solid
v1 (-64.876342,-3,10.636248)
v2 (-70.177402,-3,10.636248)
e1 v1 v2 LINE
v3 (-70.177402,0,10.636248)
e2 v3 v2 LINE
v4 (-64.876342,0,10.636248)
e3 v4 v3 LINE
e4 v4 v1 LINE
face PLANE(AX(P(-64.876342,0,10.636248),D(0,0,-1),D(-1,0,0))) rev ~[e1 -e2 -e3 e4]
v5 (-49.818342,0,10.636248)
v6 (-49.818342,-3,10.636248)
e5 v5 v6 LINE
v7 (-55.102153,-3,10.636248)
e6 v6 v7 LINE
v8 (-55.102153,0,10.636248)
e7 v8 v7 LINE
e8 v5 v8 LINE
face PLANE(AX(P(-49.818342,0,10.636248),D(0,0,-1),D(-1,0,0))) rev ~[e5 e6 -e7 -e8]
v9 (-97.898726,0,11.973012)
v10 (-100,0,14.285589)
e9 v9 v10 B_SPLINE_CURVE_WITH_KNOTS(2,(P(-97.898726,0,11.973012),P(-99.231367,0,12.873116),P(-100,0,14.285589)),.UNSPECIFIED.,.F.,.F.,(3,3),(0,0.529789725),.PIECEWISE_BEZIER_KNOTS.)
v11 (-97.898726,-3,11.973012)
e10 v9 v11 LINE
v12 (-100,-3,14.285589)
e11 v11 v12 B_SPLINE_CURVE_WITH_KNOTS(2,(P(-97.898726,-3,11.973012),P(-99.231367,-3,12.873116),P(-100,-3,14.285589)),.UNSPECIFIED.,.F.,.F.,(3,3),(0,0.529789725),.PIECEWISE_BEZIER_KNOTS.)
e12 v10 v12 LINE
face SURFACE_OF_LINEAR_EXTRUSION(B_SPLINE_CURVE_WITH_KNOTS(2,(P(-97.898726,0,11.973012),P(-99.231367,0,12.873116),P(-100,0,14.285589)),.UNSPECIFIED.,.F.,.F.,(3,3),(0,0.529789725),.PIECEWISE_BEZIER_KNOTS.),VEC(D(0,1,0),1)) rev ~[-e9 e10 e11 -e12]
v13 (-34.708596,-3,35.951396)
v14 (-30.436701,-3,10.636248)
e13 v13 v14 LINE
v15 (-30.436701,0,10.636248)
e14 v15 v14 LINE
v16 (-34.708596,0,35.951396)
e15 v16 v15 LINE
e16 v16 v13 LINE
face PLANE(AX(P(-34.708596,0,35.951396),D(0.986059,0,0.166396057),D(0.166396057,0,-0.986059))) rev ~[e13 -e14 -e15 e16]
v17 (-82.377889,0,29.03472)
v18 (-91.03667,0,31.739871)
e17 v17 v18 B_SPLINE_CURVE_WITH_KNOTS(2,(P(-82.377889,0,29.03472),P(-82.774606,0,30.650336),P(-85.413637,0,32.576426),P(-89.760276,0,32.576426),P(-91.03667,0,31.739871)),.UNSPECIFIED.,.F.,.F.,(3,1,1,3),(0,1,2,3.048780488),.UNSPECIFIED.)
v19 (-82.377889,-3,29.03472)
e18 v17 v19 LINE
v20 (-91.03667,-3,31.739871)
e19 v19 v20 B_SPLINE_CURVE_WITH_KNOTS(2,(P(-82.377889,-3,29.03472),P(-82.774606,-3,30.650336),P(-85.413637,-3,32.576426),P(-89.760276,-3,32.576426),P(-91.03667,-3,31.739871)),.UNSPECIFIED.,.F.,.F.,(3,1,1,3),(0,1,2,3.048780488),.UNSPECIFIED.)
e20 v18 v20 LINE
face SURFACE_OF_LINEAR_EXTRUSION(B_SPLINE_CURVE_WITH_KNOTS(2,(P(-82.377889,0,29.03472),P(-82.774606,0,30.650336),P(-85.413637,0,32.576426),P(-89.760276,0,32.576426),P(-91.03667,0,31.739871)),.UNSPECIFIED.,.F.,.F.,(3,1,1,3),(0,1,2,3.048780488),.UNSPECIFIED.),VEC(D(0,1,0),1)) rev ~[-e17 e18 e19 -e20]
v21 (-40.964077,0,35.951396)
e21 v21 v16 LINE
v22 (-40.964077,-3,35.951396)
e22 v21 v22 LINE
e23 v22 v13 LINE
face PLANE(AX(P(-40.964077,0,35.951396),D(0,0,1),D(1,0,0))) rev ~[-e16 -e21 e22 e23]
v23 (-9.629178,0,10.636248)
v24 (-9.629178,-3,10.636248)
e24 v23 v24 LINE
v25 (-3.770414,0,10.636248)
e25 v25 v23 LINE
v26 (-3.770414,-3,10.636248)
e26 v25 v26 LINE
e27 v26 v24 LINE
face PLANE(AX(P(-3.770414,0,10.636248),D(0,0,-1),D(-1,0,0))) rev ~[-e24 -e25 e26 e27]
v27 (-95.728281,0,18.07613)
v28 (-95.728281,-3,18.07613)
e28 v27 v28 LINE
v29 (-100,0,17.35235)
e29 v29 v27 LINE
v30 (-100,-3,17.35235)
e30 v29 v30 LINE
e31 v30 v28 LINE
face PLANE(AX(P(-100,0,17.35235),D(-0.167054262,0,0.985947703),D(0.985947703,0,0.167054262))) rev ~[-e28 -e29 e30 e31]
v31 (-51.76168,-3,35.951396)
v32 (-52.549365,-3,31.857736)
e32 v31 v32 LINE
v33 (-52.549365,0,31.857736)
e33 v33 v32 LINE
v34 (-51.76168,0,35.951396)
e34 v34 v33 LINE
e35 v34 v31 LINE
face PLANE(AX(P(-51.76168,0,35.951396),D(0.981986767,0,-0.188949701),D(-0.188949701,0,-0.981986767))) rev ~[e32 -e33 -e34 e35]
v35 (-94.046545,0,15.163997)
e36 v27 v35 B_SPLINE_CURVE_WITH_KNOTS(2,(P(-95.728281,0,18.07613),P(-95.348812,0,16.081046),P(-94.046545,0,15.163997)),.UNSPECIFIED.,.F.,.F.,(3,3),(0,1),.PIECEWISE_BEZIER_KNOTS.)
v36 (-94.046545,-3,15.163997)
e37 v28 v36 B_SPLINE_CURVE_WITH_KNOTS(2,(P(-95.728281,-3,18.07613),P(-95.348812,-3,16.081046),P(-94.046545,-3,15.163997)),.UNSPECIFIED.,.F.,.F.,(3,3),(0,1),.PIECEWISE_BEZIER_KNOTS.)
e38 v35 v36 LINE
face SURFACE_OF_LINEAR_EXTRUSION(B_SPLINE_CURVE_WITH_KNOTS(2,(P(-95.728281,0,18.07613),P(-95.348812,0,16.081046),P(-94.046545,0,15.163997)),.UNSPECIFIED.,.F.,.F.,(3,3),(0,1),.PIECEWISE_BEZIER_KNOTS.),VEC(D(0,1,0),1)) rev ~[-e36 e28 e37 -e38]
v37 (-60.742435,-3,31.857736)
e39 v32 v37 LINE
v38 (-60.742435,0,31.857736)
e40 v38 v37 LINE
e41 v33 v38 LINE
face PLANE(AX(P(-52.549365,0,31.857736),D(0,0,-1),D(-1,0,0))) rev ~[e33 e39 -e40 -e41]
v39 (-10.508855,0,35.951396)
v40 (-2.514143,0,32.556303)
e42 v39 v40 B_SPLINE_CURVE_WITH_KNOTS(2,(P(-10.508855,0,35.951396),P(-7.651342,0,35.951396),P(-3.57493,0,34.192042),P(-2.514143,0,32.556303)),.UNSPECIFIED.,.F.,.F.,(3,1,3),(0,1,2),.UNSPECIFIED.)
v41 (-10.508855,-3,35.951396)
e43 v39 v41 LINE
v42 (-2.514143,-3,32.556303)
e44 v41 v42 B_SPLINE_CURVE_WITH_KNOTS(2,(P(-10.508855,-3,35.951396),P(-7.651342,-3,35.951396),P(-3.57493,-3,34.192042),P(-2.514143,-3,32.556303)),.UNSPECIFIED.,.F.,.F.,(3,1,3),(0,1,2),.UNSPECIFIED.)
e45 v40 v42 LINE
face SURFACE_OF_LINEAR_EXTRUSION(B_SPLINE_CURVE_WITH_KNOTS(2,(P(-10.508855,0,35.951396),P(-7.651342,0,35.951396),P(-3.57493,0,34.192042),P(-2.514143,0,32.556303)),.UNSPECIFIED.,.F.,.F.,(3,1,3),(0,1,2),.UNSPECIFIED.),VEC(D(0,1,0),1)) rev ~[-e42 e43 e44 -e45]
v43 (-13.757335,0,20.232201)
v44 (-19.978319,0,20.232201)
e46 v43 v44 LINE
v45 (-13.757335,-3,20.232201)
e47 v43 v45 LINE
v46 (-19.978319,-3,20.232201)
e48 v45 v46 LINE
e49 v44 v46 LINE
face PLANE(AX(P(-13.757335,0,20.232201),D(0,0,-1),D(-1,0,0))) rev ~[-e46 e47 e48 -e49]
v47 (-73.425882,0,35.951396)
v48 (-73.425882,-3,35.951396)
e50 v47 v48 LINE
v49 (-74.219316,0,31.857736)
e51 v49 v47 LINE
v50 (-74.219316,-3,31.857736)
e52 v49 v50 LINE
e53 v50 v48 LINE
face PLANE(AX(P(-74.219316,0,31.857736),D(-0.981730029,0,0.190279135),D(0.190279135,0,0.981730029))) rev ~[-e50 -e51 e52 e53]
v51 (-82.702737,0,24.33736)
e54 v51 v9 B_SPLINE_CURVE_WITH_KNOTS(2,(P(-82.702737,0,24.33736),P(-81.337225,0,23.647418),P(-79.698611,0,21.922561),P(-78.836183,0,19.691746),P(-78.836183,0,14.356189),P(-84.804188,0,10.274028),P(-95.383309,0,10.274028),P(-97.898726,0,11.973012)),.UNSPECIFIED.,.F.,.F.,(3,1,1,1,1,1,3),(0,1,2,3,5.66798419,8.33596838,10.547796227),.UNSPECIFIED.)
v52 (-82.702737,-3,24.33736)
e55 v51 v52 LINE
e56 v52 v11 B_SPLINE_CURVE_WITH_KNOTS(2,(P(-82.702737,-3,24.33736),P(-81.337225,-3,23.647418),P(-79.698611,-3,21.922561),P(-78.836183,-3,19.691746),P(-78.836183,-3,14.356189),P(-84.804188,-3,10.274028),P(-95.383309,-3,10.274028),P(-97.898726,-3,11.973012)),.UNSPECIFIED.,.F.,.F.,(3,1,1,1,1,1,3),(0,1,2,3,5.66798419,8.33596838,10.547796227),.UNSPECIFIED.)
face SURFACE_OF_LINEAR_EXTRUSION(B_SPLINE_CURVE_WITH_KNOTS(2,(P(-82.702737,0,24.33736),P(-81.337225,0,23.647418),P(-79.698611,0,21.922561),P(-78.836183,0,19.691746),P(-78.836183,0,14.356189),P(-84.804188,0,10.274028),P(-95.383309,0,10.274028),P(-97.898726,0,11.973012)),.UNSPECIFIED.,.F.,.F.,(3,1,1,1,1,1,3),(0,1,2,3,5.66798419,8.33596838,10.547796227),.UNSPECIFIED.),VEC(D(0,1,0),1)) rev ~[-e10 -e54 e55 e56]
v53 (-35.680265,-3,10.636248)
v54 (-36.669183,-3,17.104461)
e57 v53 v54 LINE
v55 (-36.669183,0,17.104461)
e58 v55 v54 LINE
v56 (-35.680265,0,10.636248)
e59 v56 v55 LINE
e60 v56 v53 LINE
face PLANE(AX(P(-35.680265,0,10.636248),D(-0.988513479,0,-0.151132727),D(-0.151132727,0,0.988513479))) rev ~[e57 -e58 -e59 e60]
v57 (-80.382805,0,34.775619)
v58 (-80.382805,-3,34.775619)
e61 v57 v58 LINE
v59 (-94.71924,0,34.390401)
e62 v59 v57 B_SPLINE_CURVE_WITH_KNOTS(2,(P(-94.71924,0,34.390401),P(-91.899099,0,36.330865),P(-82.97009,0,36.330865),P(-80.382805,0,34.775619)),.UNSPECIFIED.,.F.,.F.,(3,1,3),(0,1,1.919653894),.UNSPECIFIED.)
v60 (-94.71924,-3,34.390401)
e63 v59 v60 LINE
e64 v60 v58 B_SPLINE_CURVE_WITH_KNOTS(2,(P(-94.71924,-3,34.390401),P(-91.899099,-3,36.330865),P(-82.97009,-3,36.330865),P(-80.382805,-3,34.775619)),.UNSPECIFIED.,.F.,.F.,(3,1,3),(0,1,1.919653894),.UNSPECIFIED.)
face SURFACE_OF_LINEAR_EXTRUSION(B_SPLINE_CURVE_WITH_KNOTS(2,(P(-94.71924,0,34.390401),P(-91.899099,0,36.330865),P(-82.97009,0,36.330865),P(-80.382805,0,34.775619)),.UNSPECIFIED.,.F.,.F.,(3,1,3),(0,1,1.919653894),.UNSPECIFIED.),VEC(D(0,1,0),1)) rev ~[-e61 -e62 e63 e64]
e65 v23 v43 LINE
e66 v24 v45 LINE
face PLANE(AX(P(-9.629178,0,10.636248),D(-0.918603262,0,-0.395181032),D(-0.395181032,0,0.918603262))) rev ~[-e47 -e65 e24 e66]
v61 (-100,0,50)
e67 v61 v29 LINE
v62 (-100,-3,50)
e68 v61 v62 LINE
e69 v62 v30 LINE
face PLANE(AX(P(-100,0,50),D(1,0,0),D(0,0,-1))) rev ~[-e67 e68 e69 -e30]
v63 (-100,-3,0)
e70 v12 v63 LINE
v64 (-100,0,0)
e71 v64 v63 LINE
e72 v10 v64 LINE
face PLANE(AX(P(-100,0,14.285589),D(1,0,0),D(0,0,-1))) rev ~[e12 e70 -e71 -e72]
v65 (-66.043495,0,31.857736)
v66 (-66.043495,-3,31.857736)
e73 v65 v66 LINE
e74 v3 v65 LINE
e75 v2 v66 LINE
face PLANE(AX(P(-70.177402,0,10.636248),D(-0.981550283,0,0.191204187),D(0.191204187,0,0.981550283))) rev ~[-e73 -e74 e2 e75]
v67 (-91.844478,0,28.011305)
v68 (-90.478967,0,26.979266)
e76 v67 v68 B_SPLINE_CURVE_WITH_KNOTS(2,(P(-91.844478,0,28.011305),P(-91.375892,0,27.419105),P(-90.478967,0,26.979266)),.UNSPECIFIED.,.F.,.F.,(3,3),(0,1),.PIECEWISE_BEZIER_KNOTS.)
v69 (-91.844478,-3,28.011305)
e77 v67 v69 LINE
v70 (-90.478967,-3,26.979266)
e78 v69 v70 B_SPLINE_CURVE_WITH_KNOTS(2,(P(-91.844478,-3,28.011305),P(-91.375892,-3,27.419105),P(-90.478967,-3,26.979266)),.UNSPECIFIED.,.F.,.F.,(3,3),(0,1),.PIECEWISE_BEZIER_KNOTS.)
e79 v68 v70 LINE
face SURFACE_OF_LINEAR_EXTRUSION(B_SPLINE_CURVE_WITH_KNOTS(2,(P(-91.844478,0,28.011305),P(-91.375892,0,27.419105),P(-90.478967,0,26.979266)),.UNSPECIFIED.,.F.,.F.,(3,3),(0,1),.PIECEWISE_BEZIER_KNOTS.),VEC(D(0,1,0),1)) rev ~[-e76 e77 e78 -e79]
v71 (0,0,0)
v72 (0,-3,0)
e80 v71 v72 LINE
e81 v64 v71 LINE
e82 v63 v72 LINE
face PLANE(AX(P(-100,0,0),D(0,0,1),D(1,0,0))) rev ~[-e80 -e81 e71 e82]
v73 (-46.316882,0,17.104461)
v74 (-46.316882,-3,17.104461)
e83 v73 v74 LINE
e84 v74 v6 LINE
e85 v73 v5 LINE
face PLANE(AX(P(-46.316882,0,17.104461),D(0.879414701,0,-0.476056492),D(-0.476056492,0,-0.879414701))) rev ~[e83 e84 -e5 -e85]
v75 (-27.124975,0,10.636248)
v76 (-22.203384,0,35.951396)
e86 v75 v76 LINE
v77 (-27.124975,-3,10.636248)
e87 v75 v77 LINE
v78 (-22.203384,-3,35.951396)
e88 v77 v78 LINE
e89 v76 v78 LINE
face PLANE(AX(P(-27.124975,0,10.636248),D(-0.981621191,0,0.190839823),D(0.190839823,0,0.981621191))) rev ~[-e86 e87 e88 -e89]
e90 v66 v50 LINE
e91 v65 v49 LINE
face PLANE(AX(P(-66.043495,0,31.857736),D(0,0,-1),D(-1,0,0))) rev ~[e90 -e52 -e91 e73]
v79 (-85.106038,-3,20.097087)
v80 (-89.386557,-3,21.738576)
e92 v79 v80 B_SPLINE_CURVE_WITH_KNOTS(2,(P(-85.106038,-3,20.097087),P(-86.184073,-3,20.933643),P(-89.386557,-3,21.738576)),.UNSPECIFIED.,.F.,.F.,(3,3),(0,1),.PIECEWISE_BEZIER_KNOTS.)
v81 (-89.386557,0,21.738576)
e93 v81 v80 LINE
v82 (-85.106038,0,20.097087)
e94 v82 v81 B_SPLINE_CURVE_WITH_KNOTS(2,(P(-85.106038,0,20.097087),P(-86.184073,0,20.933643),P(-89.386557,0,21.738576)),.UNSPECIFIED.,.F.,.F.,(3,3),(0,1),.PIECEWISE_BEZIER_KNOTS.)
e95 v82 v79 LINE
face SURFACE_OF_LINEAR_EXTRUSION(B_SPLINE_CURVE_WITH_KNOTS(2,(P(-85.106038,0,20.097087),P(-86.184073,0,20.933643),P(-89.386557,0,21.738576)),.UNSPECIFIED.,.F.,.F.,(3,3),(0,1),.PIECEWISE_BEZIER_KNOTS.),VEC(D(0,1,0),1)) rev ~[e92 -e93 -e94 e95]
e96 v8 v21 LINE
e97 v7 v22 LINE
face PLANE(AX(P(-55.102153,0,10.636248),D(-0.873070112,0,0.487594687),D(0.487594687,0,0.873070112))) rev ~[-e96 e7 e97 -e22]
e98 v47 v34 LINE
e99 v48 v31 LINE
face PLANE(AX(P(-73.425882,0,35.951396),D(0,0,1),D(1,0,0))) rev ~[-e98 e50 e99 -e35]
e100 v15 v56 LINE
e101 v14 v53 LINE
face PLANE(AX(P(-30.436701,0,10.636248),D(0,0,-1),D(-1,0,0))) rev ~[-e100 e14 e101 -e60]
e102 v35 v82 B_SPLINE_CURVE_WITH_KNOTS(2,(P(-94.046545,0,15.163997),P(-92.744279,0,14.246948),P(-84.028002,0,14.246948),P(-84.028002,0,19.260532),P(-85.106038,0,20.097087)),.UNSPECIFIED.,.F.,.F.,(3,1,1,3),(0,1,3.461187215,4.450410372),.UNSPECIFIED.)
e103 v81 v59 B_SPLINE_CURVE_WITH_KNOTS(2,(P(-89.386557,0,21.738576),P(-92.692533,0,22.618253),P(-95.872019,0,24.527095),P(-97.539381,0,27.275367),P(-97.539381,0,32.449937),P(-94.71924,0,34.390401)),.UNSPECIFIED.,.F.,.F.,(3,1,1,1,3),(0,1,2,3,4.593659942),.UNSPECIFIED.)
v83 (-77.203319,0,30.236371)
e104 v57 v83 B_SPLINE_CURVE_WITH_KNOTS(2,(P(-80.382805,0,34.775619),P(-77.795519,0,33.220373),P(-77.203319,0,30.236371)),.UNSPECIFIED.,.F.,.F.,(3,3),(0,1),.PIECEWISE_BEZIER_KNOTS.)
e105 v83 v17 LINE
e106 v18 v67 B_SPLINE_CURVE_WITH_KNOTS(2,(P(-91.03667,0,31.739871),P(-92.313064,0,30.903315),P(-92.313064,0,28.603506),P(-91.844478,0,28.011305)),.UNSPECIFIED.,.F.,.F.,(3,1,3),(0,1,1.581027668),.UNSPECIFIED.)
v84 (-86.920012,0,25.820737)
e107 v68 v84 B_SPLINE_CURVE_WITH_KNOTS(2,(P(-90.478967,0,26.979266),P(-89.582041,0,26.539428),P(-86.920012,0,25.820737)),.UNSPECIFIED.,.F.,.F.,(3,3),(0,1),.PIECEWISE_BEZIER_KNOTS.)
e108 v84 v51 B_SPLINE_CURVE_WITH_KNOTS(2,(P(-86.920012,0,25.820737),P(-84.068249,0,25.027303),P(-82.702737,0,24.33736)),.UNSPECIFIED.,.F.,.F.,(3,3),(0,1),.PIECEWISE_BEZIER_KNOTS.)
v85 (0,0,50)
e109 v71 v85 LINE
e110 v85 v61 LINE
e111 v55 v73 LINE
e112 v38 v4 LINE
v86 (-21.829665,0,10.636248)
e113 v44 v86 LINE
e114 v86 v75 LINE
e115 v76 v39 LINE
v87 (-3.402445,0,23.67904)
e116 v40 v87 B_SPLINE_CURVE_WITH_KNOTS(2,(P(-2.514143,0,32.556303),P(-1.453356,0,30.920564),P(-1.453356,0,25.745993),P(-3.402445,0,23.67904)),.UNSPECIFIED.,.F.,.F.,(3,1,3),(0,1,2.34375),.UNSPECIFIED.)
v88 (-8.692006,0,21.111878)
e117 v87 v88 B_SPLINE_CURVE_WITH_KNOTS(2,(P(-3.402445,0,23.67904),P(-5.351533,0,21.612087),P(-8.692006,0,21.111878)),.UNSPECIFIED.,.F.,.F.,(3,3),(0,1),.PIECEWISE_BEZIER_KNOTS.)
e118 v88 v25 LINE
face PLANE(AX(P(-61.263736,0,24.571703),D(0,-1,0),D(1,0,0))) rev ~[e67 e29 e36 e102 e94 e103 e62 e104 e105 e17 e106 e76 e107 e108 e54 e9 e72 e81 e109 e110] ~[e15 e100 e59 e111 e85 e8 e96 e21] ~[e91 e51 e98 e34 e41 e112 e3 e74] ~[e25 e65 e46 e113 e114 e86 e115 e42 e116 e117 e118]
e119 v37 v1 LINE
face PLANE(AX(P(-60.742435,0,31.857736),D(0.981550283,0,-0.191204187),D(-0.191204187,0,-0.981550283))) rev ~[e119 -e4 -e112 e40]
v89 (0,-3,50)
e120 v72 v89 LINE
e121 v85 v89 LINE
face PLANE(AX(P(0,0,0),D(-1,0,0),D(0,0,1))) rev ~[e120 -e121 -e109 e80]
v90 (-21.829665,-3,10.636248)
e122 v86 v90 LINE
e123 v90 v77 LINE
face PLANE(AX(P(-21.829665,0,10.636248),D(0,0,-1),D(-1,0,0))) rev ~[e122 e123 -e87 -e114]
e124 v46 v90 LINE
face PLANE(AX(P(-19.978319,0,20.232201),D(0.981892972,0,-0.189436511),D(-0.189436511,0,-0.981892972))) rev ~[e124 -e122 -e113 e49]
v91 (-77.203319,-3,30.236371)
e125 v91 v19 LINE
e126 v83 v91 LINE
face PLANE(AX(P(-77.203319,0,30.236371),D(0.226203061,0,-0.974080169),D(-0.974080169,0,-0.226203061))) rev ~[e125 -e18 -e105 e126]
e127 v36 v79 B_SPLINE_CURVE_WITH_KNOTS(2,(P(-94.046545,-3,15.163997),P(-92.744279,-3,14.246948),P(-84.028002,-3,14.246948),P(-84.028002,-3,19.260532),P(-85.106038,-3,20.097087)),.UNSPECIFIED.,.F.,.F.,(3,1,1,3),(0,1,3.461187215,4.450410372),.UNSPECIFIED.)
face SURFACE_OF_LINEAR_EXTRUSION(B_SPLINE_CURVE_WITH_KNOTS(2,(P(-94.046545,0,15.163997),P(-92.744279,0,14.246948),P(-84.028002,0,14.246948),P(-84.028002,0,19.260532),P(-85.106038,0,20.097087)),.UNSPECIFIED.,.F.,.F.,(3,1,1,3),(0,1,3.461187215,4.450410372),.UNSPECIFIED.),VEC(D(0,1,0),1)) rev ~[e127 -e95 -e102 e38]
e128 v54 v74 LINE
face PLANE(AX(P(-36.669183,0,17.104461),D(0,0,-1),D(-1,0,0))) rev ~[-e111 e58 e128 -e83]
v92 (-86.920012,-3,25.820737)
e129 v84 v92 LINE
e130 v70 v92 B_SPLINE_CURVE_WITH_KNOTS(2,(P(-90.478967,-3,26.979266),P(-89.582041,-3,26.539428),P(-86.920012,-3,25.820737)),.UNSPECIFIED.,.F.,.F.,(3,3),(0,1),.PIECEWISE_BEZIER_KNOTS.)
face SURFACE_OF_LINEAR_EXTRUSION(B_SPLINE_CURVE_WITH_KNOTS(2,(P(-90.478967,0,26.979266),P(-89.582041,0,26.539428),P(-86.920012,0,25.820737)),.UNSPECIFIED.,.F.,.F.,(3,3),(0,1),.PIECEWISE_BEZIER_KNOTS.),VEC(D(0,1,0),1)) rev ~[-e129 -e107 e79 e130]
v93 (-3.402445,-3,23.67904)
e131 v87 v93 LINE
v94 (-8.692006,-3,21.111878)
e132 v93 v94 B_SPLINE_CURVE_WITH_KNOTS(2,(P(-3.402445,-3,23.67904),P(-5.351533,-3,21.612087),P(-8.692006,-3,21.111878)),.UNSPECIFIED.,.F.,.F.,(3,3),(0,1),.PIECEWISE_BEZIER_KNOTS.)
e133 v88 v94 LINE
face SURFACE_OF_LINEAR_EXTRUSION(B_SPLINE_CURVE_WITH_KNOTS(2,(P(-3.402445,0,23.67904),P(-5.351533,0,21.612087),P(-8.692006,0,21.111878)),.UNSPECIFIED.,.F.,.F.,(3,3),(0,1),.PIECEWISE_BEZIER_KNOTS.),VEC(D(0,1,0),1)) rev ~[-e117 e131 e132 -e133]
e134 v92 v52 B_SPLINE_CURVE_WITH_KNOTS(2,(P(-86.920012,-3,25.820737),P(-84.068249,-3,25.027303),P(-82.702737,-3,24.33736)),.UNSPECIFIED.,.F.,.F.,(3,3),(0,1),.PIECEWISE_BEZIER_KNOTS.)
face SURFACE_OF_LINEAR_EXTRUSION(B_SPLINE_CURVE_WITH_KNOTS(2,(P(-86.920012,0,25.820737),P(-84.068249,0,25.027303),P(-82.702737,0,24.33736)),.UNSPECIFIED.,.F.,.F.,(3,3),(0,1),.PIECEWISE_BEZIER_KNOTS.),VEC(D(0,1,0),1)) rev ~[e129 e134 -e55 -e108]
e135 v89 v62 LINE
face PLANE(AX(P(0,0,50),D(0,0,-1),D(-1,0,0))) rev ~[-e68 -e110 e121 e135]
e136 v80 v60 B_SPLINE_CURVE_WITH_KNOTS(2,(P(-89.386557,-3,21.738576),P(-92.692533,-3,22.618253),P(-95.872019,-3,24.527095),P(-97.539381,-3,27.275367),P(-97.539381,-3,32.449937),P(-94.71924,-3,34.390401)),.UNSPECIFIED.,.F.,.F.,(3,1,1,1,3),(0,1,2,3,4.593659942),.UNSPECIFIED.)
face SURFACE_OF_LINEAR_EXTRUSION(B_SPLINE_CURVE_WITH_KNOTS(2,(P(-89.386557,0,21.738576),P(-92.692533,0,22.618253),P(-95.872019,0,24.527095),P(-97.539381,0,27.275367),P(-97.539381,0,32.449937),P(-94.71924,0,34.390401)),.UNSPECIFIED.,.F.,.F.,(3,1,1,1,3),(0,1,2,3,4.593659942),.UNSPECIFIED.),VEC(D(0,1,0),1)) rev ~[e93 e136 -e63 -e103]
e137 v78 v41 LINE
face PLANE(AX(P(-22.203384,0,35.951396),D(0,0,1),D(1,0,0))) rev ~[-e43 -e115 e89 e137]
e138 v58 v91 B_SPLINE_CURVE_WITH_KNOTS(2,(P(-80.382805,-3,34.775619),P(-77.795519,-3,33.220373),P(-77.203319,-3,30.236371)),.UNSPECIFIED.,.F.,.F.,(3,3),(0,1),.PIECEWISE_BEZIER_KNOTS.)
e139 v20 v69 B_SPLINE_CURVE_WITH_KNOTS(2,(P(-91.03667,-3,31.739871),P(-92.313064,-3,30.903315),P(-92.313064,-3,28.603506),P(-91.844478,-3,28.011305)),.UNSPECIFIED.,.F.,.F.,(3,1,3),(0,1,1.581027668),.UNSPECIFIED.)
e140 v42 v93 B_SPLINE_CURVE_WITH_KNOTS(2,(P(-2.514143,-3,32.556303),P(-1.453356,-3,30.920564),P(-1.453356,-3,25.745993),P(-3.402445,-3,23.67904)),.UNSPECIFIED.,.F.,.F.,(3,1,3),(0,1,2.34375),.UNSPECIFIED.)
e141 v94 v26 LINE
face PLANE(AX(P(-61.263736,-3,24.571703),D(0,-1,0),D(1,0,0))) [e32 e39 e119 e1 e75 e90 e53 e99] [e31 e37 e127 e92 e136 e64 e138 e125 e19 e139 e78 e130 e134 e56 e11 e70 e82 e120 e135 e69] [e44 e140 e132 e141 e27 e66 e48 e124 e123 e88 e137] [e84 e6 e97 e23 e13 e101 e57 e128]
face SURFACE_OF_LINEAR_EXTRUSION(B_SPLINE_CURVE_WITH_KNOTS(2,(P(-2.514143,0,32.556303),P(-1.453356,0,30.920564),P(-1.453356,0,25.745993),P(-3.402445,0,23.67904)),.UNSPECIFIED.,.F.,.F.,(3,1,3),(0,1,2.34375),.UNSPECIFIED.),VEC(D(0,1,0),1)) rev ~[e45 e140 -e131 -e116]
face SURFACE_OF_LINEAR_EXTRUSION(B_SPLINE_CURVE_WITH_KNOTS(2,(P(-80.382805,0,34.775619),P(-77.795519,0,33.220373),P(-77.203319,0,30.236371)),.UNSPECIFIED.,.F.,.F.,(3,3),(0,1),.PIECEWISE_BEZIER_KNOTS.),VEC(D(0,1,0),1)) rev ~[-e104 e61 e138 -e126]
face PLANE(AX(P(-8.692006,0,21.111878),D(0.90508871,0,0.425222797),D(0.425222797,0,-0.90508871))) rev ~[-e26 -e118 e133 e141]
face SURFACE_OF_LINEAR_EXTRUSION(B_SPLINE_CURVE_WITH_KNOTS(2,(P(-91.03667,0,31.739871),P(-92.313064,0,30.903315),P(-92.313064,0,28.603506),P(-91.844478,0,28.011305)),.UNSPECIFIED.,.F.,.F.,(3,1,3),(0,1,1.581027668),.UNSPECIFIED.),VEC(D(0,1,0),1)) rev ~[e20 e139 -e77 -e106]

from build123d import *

# Parameters (mm, degrees)
F1_DEPTH = 3


with BuildPart() as f1:
    # F0 (on Front) → F1 (new body)
    with BuildSketch(Plane.XZ):
        with BuildLine():
            Line((-100, 0), (0, 0))
            Line((0, 0), (0, 50))
            Line((0, 50), (-100, 50))
            Line((-100, 50), (-100, 17.3523504695))
            Line((-100, 17.3523504695), (-95.7282808558, 18.0761301251))
            add(Edge.make_bspline(
                [(-95.7282808558, 18.0761301251), (-95.3488123547, 16.081045733), (-94.0465454532, 15.1639968553)],
                knots=[0, 0, 0, 1, 1, 1], degree=2))
            add(Edge.make_bspline(
                [(-94.0465454532, 15.1639968553), (-92.7442785517, 14.2469479777), (-90.2259875899, 14.2469479777)],
                knots=[0, 0, 0, 1, 1, 1], degree=2))
            add(Edge.make_bspline(
                [(-90.2259875899, 14.2469479777), (-84.0280020719, 14.2469479777), (-84.0280020719, 17.8231511244)],
                knots=[0, 0, 0, 1, 1, 1], degree=2))
            add(Edge.make_bspline(
                [(-84.0280020719, 17.8231511244), (-84.0280020719, 19.2605318104), (-85.1060375864, 20.0970873696)],
                knots=[0, 0, 0, 1, 1, 1], degree=2))
            add(Edge.make_bspline(
                [(-85.1060375864, 20.0970873696), (-86.1840731009, 20.9336429289), (-89.3865572693, 21.738576113)],
                knots=[0, 0, 0, 1, 1, 1], degree=2))
            add(Edge.make_bspline(
                [(-89.3865572693, 21.738576113), (-92.692532847, 22.6182530928), (-94.2822758857, 23.5726738683)],
                knots=[0, 0, 0, 1, 1, 1], degree=2))
            add(Edge.make_bspline(
                [(-94.2822758857, 23.5726738683), (-95.8720189244, 24.5270946438), (-96.7056997223, 25.9012305796)],
                knots=[0, 0, 0, 1, 1, 1], degree=2))
            add(Edge.make_bspline(
                [(-96.7056997223, 25.9012305796), (-97.5393805202, 27.2753665154), (-97.5393805202, 29.2704509076)],
                knots=[0, 0, 0, 1, 1, 1], degree=2))
            add(Edge.make_bspline(
                [(-97.5393805202, 29.2704509076), (-97.5393805202, 32.449936985), (-94.7192396143, 34.390400911)],
                knots=[0, 0, 0, 1, 1, 1], degree=2))
            add(Edge.make_bspline(
                [(-94.7192396143, 34.390400911), (-91.8990987084, 36.3308648371), (-87.2477348085, 36.3308648371)],
                knots=[0, 0, 0, 1, 1, 1], degree=2))
            add(Edge.make_bspline(
                [(-87.2477348085, 36.3308648371), (-82.9700898871, 36.3308648371), (-80.3828046523, 34.7756189349)],
                knots=[0, 0, 0, 1, 1, 1], degree=2))
            add(Edge.make_bspline(
                [(-80.3828046523, 34.7756189349), (-77.7955194175, 33.2203730326), (-77.2033185749, 30.2363707285)],
                knots=[0, 0, 0, 1, 1, 1], degree=2))
            Line((-77.2033185749, 30.2363707285), (-82.3778890444, 29.0347204751))
            add(Edge.make_bspline(
                [(-82.3778890444, 29.0347204751), (-82.7746061138, 30.6503363661), (-84.0941215835, 31.6133814257)],
                knots=[0, 0, 0, 1, 1, 1], degree=2))
            add(Edge.make_bspline(
                [(-84.0941215835, 31.6133814257), (-85.4136370532, 32.5764264853), (-87.5352109457, 32.5764264853)],
                knots=[0, 0, 0, 1, 1, 1], degree=2))
            add(Edge.make_bspline(
                [(-87.5352109457, 32.5764264853), (-89.7602762476, 32.5764264853), (-91.0366702968, 31.7398709261)],
                knots=[0, 0, 0, 1, 1, 1], degree=2))
            add(Edge.make_bspline(
                [(-91.0366702968, 31.7398709261), (-92.3130643459, 30.9033153668), (-92.3130643459, 29.4486861126)],
                knots=[0, 0, 0, 1, 1, 1], degree=2))
            add(Edge.make_bspline(
                [(-92.3130643459, 29.4486861126), (-92.3130643459, 28.6035062693), (-91.8444782423, 28.0113054266)],
                knots=[0, 0, 0, 1, 1, 1], degree=2))
            add(Edge.make_bspline(
                [(-91.8444782423, 28.0113054266), (-91.3758921387, 27.419104584), (-90.4789665906, 26.9792660941)],
                knots=[0, 0, 0, 1, 1, 1], degree=2))
            add(Edge.make_bspline(
                [(-90.4789665906, 26.9792660941), (-89.5820410426, 26.5394276042), (-86.9200120121, 25.8207372612)],
                knots=[0, 0, 0, 1, 1, 1], degree=2))
            add(Edge.make_bspline(
                [(-86.9200120121, 25.8207372612), (-84.0682487312, 25.0273031225), (-82.7027370795, 24.3373603933)],
                knots=[0, 0, 0, 1, 1, 1], degree=2))
            add(Edge.make_bspline(
                [(-82.7027370795, 24.3373603933), (-81.3372254278, 23.647417664), (-80.5179184368, 22.7849892524)],
                knots=[0, 0, 0, 1, 1, 1], degree=2))
            add(Edge.make_bspline(
                [(-80.5179184368, 22.7849892524), (-79.6986114458, 21.9225608408), (-79.26739724, 20.8071534285)],
                knots=[0, 0, 0, 1, 1, 1], degree=2))
            add(Edge.make_bspline(
                [(-79.26739724, 20.8071534285), (-78.8361830342, 19.6917460162), (-78.8361830342, 18.237116762)],
                knots=[0, 0, 0, 1, 1, 1], degree=2))
            add(Edge.make_bspline(
                [(-78.8361830342, 18.237116762), (-78.8361830342, 14.3561889098), (-81.8201853383, 12.3151083357)],
                knots=[0, 0, 0, 1, 1, 1], degree=2))
            add(Edge.make_bspline(
                [(-81.8201853383, 12.3151083357), (-84.8041876424, 10.2740277616), (-90.5882075228, 10.2740277616)],
                knots=[0, 0, 0, 1, 1, 1], degree=2))
            add(Edge.make_bspline(
                [(-90.5882075228, 10.2740277616), (-95.3833094912, 10.2740277616), (-97.8987256917, 11.9730117325)],
                knots=[0, 0, 0, 1, 1, 1], degree=2))
            add(Edge.make_bspline(
                [(-97.8987256917, 11.9730117325), (-99.2313673487, 12.8731159831), (-100, 14.2855889299)],
                knots=[0, 0, 0, 0.529789725, 0.529789725, 0.529789725], degree=2))
            Line((-100, 14.2855889299), (-100, 0))
        make_face()
        Polygon((-52.5493650489, 31.8577361423), (-60.742434959, 31.8577361423), (-64.8763418119, 10.6362476945), (-70.1774017818, 10.6362476945), (-66.0434949289, 31.8577361423), (-74.2193162708, 31.8577361423), (-73.4258821321, 35.951396336), (-51.761680433, 35.951396336), align=None, mode=Mode.SUBTRACT)
        Polygon((-30.4367005758, 10.6362476945), (-35.6802653183, 10.6362476945), (-36.6691832302, 17.1044607814), (-46.3168823945, 17.1044607814), (-49.8183417456, 10.6362476945), (-55.1021531472, 10.6362476945), (-40.9640767199, 35.951396336), (-34.7085959745, 35.951396336), align=None, mode=Mode.SUBTRACT)
        with BuildLine():
            Line((-3.7704140895, 10.6362476945), (-9.6291777655, 10.6362476945))
            Line((-9.6291777655, 10.6362476945), (-13.7573350957, 20.2322011541))
            Line((-13.7573350957, 20.2322011541), (-19.9783187046, 20.2322011541))
            Line((-19.9783187046, 20.2322011541), (-21.8296650281, 10.6362476945))
            Line((-21.8296650281, 10.6362476945), (-27.1249754753, 10.6362476945))
            Line((-27.1249754753, 10.6362476945), (-22.2033840065, 35.951396336))
            Line((-22.2033840065, 35.951396336), (-10.5088547453, 35.951396336))
            add(Edge.make_bspline(
                [(-10.5088547453, 35.951396336), (-7.6513419416, 35.951396336), (-5.6131361289, 35.0717193562)],
                knots=[0, 0, 0, 1, 1, 1], degree=2))
            add(Edge.make_bspline(
                [(-5.6131361289, 35.0717193562), (-3.5749303162, 34.1920423764), (-2.5141433699, 32.5563031557)],
                knots=[0, 0, 0, 1, 1, 1], degree=2))
            add(Edge.make_bspline(
                [(-2.5141433699, 32.5563031557), (-1.4533564237, 30.9205639351), (-1.4533564237, 28.7127472014)],
                knots=[0, 0, 0, 1, 1, 1], degree=2))
            add(Edge.make_bspline(
                [(-1.4533564237, 28.7127472014), (-1.4533564237, 25.7459934655), (-3.4024446338, 23.6790400391)],
                knots=[0, 0, 0, 1, 1, 1], degree=2))
            add(Edge.make_bspline(
                [(-3.4024446338, 23.6790400391), (-5.351532844, 21.6120866127), (-8.6920055583, 21.1118781339)],
                knots=[0, 0, 0, 1, 1, 1], degree=2))
            Line((-8.6920055583, 21.1118781339), (-3.7704140895, 10.6362476945))
        make_face(mode=Mode.SUBTRACT)
    extrude(amount=F1_DEPTH)


solid = f1.part
